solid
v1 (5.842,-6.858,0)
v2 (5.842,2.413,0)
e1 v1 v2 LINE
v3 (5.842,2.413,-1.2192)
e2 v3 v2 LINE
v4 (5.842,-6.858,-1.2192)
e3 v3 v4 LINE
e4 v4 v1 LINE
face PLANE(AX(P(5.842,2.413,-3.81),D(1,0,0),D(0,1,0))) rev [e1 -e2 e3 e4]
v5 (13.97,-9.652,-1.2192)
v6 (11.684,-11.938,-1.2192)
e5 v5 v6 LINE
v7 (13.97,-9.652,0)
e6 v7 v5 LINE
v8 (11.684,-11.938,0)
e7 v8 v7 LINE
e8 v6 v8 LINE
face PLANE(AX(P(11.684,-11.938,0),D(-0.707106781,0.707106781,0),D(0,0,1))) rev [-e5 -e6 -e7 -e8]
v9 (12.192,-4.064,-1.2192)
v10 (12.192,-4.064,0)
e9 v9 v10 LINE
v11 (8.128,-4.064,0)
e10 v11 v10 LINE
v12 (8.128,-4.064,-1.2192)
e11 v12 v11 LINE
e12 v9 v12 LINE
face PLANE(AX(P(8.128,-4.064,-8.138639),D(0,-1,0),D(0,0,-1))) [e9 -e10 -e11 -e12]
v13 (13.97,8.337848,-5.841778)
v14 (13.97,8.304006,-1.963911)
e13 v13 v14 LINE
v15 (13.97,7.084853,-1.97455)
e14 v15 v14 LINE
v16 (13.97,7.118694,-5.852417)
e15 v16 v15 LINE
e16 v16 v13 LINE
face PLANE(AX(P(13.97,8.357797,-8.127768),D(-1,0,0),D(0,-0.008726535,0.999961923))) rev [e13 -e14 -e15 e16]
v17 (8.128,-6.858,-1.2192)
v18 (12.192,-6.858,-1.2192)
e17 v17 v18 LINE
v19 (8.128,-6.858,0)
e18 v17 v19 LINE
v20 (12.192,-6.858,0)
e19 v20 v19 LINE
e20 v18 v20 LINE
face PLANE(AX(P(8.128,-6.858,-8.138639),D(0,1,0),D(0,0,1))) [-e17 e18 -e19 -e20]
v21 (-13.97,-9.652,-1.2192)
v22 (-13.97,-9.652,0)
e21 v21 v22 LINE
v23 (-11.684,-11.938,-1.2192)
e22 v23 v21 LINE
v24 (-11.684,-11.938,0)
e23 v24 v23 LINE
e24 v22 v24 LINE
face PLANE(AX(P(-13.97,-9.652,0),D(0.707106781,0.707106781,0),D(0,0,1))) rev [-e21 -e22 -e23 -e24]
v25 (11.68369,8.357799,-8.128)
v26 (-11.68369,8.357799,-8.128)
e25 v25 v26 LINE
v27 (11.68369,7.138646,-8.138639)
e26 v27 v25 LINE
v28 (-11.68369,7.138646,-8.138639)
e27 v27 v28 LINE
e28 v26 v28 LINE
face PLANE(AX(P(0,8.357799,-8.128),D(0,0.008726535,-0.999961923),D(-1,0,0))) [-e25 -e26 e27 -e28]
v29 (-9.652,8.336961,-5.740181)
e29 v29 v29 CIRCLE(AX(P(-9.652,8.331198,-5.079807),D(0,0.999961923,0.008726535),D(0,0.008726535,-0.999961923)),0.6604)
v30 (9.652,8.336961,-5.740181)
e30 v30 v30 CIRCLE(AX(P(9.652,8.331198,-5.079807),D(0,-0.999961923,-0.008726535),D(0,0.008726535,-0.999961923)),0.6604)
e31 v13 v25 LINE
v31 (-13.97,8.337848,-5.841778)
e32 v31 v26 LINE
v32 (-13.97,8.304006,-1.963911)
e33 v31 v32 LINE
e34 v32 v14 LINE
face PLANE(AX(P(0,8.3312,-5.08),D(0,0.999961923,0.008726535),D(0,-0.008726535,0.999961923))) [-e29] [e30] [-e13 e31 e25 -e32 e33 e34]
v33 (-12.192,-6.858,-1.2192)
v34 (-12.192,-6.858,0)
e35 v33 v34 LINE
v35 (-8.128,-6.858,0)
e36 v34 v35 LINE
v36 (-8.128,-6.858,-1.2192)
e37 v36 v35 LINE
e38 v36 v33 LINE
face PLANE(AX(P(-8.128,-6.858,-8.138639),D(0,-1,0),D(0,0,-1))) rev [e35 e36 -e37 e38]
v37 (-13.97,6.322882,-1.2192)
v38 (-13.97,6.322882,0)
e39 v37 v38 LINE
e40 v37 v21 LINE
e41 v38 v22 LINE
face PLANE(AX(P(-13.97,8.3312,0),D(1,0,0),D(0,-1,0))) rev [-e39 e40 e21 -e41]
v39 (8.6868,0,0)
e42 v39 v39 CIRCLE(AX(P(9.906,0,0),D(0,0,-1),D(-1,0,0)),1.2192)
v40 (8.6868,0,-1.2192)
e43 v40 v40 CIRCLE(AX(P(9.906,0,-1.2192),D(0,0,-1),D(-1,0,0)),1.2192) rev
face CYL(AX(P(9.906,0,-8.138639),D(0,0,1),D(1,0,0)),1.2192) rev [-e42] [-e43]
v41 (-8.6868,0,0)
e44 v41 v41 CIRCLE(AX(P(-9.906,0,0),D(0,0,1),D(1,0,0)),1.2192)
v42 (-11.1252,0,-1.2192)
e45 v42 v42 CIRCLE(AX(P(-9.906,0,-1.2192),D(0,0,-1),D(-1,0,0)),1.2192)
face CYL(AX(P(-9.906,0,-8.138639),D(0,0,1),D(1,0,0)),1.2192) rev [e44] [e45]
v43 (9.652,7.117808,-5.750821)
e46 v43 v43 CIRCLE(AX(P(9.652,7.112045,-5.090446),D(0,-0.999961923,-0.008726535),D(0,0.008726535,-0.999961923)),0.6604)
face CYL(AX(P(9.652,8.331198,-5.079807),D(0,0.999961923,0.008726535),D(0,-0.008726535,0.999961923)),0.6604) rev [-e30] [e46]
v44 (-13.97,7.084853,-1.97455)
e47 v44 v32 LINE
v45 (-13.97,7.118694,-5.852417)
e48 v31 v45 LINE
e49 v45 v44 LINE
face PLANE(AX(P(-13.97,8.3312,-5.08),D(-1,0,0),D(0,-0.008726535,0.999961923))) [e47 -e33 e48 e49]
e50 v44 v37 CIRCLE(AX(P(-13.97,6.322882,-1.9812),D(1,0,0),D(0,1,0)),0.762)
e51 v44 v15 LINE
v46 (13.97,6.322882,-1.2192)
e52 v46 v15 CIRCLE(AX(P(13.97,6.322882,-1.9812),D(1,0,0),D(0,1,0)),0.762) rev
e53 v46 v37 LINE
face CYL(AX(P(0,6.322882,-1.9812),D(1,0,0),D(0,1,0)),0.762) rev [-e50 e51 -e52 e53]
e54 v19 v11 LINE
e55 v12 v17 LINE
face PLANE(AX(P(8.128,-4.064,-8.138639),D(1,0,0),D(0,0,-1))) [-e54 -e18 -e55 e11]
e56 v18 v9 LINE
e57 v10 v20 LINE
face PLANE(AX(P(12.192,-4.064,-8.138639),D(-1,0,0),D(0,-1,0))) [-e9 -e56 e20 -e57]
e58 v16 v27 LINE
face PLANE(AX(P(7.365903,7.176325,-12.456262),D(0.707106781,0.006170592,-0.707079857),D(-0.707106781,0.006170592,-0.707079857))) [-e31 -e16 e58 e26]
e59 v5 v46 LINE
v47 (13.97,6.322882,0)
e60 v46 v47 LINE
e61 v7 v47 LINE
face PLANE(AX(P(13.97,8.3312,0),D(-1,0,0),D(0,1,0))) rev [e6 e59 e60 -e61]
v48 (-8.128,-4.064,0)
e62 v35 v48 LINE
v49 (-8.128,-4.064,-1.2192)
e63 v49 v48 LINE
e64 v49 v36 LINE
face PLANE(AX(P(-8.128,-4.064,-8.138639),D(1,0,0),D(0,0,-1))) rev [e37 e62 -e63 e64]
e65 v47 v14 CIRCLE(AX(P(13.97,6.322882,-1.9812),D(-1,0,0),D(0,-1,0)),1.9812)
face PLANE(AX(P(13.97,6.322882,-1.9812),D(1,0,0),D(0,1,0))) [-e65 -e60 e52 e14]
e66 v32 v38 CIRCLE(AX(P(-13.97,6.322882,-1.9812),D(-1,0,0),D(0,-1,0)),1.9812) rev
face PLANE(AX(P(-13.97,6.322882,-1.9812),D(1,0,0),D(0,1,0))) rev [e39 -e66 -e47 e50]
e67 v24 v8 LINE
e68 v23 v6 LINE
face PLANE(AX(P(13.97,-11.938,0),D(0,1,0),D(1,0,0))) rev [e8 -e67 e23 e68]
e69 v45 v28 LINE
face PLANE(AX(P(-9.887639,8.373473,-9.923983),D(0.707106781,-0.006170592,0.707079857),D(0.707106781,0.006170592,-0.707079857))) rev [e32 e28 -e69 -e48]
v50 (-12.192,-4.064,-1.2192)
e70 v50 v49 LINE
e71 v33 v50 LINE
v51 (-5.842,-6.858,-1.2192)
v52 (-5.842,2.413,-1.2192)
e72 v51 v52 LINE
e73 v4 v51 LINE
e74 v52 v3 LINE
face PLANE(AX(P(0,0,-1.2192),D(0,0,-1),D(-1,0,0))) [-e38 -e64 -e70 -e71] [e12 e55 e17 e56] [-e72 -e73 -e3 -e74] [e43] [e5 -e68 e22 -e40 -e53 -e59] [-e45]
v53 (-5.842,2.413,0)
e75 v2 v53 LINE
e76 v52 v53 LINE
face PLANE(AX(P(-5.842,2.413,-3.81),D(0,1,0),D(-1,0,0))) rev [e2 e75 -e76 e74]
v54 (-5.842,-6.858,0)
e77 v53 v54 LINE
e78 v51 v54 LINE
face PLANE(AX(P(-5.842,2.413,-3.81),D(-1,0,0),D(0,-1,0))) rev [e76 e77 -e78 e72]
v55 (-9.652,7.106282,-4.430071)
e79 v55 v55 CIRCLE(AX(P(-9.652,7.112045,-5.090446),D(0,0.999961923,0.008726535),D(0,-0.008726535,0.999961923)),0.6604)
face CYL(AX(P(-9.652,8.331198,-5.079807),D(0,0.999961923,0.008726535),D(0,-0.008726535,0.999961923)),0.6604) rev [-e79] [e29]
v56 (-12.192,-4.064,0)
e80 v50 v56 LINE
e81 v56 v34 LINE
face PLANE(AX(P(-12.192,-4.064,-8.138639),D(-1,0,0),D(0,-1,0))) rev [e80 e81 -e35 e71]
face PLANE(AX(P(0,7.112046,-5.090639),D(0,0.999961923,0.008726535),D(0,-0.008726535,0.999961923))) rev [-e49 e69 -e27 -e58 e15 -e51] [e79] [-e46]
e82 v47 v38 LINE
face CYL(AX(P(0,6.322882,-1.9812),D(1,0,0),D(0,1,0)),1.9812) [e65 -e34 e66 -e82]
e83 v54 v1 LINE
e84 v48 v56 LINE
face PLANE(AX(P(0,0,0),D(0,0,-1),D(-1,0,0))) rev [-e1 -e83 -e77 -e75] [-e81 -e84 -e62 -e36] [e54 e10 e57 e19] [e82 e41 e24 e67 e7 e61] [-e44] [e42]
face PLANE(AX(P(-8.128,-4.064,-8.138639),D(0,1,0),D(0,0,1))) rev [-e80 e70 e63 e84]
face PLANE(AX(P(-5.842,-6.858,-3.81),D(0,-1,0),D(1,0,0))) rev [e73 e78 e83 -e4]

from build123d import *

# Parameters (mm, degrees)
SKETCH2_W              = 27.94
SKETCH2_H              = 20.2692
BOSS_EXTRUDE2_DEPTH    = 8.128
DRAFT1_ANGLE           = 0.5
CONVERT_SOLID1_START   = -13.97
CONVERT_SOLID1_DEPTH   = 27.94
CONVERT_SOLID1_2_DEPTH = 27.94
SKETCH26_R             = 0.6604
CUT_EXTRUDE6_DEPTH     = 27.664739949
SKETCH16_R             = 1.2192
SKETCH16_W             = 4.064
SKETCH16_H             = 2.794
CUT_EXTRUDE4_DEPTH     = 60.515150005
SKETCH35_W             = 11.684
SKETCH35_H             = 9.271
CUT_EXTRUDE7_DEPTH     = 3.81
CHAMFER1_SIZE          = 2.286


# Read off the part's stored shape, not the designer's step: Convert-Solid1
with BuildPart() as part:
    # Sketch2 → Boss-Extrude2 (new body)
    with BuildSketch(Plane.XY):
        with Locations((0, -1.8034)):
            Rectangle(SKETCH2_W, SKETCH2_H)
    extrude(amount=-BOSS_EXTRUDE2_DEPTH)

    # Draft1
    draft1_faces = [part.faces().sort_by_distance(p)[0] for p in [
        (0, 8.3312, -4.064),
    ]]
    draft(draft1_faces, Plane.XY.offset(-5.08), DRAFT1_ANGLE)

    # Convert-Solid1 outline → Convert-Solid1 (cut)
    with BuildSketch(Plane.YZ.offset(CONVERT_SOLID1_START)):
        with BuildLine():
            Line((-11.938, -8.128), (7.138553067, -8.128))
            Line((7.138553067, -8.128), (7.084852727, -1.97455038))
            ThreePointArc((7.084852727, -1.97455038), (6.859340961, -1.440038744), (6.322881741, -1.2192))
            Line((6.322881741, -1.2192), (-11.938, -1.2192))
            Line((-11.938, -1.2192), (-11.938, -8.128))
        make_face()
        with BuildLine():
            ThreePointArc((6.322881741, 0), (7.717675713, -0.574180734), (8.304006303, -1.963910988))
            Line((8.304006303, -1.963910988), (8.286867512, 0))
            Line((8.286867512, 0), (6.322881741, 0))
        make_face()
    extrude(amount=CONVERT_SOLID1_DEPTH, mode=Mode.SUBTRACT)

    # Convert-Solid1 2 outline → Convert-Solid1 2 (add)
    with BuildSketch(Plane.YZ.offset(CONVERT_SOLID1_START)):
        Polygon((7.138553067, -8.128), (7.138645916, -8.138639392), (8.357799493, -8.128), align=None)
    extrude(amount=CONVERT_SOLID1_2_DEPTH)

    # Sketch26 → Cut-Extrude6 (cut, through all)
    with BuildSketch(Plane(origin=(0, 8.375524998, -10.159141632), x_dir=(1, 0, 0), z_dir=(0, -0.9999619230641713, -0.008726535498373954))):
        with Locations(Location((9.652, 5.079528476, 0), (0, 0, 270))):
            Circle(SKETCH26_R)
        Polygon((9.887639275, 0.235167751), (15.766051224, 6.1135797), (15.766051224, 0.235167751), align=None)
    cut_extrude6 = extrude(amount=CUT_EXTRUDE6_DEPTH, mode=Mode.SUBTRACT)

    # Sketch16 → Cut-Extrude4 (cut, through all)
    with BuildSketch(Plane(origin=(0, 45.339, 0), x_dir=(1, 0, 0), z_dir=(0, 0, -1))):
        with Locations(Location((9.906, 45.339, 0), (0, 0, 180))):
            Circle(SKETCH16_R)
        with Locations((10.16, 50.8)):
            Rectangle(SKETCH16_W, SKETCH16_H)
    cut_extrude4 = extrude(amount=CUT_EXTRUDE4_DEPTH, mode=Mode.SUBTRACT)

    # Mirror1: Cut-Extrude6, Cut-Extrude4 across plane
    add(cut_extrude6.mirror(Plane(origin=(0, 0, 0), x_dir=(0, 0, 1), z_dir=(1, 0, 0))), mode=Mode.SUBTRACT)
    add(cut_extrude4.mirror(Plane(origin=(0, 0, 0), x_dir=(0, 0, 1), z_dir=(1, 0, 0))), mode=Mode.SUBTRACT)

    # Sketch35 → Cut-Extrude7 (cut)
    with BuildSketch(Plane.XY):
        with Locations((0, -2.2225)):
            Rectangle(SKETCH35_W, SKETCH35_H)
    extrude(amount=-CUT_EXTRUDE7_DEPTH, mode=Mode.SUBTRACT)

    # Chamfer1
    chamfer1_edges = [part.edges().sort_by_distance(p)[0] for p in [
        (13.97, -11.938, -0.6096),
        (-13.97, -11.938, -0.6096),
    ]]
    chamfer(chamfer1_edges, length=CHAMFER1_SIZE)


solid = part.part
